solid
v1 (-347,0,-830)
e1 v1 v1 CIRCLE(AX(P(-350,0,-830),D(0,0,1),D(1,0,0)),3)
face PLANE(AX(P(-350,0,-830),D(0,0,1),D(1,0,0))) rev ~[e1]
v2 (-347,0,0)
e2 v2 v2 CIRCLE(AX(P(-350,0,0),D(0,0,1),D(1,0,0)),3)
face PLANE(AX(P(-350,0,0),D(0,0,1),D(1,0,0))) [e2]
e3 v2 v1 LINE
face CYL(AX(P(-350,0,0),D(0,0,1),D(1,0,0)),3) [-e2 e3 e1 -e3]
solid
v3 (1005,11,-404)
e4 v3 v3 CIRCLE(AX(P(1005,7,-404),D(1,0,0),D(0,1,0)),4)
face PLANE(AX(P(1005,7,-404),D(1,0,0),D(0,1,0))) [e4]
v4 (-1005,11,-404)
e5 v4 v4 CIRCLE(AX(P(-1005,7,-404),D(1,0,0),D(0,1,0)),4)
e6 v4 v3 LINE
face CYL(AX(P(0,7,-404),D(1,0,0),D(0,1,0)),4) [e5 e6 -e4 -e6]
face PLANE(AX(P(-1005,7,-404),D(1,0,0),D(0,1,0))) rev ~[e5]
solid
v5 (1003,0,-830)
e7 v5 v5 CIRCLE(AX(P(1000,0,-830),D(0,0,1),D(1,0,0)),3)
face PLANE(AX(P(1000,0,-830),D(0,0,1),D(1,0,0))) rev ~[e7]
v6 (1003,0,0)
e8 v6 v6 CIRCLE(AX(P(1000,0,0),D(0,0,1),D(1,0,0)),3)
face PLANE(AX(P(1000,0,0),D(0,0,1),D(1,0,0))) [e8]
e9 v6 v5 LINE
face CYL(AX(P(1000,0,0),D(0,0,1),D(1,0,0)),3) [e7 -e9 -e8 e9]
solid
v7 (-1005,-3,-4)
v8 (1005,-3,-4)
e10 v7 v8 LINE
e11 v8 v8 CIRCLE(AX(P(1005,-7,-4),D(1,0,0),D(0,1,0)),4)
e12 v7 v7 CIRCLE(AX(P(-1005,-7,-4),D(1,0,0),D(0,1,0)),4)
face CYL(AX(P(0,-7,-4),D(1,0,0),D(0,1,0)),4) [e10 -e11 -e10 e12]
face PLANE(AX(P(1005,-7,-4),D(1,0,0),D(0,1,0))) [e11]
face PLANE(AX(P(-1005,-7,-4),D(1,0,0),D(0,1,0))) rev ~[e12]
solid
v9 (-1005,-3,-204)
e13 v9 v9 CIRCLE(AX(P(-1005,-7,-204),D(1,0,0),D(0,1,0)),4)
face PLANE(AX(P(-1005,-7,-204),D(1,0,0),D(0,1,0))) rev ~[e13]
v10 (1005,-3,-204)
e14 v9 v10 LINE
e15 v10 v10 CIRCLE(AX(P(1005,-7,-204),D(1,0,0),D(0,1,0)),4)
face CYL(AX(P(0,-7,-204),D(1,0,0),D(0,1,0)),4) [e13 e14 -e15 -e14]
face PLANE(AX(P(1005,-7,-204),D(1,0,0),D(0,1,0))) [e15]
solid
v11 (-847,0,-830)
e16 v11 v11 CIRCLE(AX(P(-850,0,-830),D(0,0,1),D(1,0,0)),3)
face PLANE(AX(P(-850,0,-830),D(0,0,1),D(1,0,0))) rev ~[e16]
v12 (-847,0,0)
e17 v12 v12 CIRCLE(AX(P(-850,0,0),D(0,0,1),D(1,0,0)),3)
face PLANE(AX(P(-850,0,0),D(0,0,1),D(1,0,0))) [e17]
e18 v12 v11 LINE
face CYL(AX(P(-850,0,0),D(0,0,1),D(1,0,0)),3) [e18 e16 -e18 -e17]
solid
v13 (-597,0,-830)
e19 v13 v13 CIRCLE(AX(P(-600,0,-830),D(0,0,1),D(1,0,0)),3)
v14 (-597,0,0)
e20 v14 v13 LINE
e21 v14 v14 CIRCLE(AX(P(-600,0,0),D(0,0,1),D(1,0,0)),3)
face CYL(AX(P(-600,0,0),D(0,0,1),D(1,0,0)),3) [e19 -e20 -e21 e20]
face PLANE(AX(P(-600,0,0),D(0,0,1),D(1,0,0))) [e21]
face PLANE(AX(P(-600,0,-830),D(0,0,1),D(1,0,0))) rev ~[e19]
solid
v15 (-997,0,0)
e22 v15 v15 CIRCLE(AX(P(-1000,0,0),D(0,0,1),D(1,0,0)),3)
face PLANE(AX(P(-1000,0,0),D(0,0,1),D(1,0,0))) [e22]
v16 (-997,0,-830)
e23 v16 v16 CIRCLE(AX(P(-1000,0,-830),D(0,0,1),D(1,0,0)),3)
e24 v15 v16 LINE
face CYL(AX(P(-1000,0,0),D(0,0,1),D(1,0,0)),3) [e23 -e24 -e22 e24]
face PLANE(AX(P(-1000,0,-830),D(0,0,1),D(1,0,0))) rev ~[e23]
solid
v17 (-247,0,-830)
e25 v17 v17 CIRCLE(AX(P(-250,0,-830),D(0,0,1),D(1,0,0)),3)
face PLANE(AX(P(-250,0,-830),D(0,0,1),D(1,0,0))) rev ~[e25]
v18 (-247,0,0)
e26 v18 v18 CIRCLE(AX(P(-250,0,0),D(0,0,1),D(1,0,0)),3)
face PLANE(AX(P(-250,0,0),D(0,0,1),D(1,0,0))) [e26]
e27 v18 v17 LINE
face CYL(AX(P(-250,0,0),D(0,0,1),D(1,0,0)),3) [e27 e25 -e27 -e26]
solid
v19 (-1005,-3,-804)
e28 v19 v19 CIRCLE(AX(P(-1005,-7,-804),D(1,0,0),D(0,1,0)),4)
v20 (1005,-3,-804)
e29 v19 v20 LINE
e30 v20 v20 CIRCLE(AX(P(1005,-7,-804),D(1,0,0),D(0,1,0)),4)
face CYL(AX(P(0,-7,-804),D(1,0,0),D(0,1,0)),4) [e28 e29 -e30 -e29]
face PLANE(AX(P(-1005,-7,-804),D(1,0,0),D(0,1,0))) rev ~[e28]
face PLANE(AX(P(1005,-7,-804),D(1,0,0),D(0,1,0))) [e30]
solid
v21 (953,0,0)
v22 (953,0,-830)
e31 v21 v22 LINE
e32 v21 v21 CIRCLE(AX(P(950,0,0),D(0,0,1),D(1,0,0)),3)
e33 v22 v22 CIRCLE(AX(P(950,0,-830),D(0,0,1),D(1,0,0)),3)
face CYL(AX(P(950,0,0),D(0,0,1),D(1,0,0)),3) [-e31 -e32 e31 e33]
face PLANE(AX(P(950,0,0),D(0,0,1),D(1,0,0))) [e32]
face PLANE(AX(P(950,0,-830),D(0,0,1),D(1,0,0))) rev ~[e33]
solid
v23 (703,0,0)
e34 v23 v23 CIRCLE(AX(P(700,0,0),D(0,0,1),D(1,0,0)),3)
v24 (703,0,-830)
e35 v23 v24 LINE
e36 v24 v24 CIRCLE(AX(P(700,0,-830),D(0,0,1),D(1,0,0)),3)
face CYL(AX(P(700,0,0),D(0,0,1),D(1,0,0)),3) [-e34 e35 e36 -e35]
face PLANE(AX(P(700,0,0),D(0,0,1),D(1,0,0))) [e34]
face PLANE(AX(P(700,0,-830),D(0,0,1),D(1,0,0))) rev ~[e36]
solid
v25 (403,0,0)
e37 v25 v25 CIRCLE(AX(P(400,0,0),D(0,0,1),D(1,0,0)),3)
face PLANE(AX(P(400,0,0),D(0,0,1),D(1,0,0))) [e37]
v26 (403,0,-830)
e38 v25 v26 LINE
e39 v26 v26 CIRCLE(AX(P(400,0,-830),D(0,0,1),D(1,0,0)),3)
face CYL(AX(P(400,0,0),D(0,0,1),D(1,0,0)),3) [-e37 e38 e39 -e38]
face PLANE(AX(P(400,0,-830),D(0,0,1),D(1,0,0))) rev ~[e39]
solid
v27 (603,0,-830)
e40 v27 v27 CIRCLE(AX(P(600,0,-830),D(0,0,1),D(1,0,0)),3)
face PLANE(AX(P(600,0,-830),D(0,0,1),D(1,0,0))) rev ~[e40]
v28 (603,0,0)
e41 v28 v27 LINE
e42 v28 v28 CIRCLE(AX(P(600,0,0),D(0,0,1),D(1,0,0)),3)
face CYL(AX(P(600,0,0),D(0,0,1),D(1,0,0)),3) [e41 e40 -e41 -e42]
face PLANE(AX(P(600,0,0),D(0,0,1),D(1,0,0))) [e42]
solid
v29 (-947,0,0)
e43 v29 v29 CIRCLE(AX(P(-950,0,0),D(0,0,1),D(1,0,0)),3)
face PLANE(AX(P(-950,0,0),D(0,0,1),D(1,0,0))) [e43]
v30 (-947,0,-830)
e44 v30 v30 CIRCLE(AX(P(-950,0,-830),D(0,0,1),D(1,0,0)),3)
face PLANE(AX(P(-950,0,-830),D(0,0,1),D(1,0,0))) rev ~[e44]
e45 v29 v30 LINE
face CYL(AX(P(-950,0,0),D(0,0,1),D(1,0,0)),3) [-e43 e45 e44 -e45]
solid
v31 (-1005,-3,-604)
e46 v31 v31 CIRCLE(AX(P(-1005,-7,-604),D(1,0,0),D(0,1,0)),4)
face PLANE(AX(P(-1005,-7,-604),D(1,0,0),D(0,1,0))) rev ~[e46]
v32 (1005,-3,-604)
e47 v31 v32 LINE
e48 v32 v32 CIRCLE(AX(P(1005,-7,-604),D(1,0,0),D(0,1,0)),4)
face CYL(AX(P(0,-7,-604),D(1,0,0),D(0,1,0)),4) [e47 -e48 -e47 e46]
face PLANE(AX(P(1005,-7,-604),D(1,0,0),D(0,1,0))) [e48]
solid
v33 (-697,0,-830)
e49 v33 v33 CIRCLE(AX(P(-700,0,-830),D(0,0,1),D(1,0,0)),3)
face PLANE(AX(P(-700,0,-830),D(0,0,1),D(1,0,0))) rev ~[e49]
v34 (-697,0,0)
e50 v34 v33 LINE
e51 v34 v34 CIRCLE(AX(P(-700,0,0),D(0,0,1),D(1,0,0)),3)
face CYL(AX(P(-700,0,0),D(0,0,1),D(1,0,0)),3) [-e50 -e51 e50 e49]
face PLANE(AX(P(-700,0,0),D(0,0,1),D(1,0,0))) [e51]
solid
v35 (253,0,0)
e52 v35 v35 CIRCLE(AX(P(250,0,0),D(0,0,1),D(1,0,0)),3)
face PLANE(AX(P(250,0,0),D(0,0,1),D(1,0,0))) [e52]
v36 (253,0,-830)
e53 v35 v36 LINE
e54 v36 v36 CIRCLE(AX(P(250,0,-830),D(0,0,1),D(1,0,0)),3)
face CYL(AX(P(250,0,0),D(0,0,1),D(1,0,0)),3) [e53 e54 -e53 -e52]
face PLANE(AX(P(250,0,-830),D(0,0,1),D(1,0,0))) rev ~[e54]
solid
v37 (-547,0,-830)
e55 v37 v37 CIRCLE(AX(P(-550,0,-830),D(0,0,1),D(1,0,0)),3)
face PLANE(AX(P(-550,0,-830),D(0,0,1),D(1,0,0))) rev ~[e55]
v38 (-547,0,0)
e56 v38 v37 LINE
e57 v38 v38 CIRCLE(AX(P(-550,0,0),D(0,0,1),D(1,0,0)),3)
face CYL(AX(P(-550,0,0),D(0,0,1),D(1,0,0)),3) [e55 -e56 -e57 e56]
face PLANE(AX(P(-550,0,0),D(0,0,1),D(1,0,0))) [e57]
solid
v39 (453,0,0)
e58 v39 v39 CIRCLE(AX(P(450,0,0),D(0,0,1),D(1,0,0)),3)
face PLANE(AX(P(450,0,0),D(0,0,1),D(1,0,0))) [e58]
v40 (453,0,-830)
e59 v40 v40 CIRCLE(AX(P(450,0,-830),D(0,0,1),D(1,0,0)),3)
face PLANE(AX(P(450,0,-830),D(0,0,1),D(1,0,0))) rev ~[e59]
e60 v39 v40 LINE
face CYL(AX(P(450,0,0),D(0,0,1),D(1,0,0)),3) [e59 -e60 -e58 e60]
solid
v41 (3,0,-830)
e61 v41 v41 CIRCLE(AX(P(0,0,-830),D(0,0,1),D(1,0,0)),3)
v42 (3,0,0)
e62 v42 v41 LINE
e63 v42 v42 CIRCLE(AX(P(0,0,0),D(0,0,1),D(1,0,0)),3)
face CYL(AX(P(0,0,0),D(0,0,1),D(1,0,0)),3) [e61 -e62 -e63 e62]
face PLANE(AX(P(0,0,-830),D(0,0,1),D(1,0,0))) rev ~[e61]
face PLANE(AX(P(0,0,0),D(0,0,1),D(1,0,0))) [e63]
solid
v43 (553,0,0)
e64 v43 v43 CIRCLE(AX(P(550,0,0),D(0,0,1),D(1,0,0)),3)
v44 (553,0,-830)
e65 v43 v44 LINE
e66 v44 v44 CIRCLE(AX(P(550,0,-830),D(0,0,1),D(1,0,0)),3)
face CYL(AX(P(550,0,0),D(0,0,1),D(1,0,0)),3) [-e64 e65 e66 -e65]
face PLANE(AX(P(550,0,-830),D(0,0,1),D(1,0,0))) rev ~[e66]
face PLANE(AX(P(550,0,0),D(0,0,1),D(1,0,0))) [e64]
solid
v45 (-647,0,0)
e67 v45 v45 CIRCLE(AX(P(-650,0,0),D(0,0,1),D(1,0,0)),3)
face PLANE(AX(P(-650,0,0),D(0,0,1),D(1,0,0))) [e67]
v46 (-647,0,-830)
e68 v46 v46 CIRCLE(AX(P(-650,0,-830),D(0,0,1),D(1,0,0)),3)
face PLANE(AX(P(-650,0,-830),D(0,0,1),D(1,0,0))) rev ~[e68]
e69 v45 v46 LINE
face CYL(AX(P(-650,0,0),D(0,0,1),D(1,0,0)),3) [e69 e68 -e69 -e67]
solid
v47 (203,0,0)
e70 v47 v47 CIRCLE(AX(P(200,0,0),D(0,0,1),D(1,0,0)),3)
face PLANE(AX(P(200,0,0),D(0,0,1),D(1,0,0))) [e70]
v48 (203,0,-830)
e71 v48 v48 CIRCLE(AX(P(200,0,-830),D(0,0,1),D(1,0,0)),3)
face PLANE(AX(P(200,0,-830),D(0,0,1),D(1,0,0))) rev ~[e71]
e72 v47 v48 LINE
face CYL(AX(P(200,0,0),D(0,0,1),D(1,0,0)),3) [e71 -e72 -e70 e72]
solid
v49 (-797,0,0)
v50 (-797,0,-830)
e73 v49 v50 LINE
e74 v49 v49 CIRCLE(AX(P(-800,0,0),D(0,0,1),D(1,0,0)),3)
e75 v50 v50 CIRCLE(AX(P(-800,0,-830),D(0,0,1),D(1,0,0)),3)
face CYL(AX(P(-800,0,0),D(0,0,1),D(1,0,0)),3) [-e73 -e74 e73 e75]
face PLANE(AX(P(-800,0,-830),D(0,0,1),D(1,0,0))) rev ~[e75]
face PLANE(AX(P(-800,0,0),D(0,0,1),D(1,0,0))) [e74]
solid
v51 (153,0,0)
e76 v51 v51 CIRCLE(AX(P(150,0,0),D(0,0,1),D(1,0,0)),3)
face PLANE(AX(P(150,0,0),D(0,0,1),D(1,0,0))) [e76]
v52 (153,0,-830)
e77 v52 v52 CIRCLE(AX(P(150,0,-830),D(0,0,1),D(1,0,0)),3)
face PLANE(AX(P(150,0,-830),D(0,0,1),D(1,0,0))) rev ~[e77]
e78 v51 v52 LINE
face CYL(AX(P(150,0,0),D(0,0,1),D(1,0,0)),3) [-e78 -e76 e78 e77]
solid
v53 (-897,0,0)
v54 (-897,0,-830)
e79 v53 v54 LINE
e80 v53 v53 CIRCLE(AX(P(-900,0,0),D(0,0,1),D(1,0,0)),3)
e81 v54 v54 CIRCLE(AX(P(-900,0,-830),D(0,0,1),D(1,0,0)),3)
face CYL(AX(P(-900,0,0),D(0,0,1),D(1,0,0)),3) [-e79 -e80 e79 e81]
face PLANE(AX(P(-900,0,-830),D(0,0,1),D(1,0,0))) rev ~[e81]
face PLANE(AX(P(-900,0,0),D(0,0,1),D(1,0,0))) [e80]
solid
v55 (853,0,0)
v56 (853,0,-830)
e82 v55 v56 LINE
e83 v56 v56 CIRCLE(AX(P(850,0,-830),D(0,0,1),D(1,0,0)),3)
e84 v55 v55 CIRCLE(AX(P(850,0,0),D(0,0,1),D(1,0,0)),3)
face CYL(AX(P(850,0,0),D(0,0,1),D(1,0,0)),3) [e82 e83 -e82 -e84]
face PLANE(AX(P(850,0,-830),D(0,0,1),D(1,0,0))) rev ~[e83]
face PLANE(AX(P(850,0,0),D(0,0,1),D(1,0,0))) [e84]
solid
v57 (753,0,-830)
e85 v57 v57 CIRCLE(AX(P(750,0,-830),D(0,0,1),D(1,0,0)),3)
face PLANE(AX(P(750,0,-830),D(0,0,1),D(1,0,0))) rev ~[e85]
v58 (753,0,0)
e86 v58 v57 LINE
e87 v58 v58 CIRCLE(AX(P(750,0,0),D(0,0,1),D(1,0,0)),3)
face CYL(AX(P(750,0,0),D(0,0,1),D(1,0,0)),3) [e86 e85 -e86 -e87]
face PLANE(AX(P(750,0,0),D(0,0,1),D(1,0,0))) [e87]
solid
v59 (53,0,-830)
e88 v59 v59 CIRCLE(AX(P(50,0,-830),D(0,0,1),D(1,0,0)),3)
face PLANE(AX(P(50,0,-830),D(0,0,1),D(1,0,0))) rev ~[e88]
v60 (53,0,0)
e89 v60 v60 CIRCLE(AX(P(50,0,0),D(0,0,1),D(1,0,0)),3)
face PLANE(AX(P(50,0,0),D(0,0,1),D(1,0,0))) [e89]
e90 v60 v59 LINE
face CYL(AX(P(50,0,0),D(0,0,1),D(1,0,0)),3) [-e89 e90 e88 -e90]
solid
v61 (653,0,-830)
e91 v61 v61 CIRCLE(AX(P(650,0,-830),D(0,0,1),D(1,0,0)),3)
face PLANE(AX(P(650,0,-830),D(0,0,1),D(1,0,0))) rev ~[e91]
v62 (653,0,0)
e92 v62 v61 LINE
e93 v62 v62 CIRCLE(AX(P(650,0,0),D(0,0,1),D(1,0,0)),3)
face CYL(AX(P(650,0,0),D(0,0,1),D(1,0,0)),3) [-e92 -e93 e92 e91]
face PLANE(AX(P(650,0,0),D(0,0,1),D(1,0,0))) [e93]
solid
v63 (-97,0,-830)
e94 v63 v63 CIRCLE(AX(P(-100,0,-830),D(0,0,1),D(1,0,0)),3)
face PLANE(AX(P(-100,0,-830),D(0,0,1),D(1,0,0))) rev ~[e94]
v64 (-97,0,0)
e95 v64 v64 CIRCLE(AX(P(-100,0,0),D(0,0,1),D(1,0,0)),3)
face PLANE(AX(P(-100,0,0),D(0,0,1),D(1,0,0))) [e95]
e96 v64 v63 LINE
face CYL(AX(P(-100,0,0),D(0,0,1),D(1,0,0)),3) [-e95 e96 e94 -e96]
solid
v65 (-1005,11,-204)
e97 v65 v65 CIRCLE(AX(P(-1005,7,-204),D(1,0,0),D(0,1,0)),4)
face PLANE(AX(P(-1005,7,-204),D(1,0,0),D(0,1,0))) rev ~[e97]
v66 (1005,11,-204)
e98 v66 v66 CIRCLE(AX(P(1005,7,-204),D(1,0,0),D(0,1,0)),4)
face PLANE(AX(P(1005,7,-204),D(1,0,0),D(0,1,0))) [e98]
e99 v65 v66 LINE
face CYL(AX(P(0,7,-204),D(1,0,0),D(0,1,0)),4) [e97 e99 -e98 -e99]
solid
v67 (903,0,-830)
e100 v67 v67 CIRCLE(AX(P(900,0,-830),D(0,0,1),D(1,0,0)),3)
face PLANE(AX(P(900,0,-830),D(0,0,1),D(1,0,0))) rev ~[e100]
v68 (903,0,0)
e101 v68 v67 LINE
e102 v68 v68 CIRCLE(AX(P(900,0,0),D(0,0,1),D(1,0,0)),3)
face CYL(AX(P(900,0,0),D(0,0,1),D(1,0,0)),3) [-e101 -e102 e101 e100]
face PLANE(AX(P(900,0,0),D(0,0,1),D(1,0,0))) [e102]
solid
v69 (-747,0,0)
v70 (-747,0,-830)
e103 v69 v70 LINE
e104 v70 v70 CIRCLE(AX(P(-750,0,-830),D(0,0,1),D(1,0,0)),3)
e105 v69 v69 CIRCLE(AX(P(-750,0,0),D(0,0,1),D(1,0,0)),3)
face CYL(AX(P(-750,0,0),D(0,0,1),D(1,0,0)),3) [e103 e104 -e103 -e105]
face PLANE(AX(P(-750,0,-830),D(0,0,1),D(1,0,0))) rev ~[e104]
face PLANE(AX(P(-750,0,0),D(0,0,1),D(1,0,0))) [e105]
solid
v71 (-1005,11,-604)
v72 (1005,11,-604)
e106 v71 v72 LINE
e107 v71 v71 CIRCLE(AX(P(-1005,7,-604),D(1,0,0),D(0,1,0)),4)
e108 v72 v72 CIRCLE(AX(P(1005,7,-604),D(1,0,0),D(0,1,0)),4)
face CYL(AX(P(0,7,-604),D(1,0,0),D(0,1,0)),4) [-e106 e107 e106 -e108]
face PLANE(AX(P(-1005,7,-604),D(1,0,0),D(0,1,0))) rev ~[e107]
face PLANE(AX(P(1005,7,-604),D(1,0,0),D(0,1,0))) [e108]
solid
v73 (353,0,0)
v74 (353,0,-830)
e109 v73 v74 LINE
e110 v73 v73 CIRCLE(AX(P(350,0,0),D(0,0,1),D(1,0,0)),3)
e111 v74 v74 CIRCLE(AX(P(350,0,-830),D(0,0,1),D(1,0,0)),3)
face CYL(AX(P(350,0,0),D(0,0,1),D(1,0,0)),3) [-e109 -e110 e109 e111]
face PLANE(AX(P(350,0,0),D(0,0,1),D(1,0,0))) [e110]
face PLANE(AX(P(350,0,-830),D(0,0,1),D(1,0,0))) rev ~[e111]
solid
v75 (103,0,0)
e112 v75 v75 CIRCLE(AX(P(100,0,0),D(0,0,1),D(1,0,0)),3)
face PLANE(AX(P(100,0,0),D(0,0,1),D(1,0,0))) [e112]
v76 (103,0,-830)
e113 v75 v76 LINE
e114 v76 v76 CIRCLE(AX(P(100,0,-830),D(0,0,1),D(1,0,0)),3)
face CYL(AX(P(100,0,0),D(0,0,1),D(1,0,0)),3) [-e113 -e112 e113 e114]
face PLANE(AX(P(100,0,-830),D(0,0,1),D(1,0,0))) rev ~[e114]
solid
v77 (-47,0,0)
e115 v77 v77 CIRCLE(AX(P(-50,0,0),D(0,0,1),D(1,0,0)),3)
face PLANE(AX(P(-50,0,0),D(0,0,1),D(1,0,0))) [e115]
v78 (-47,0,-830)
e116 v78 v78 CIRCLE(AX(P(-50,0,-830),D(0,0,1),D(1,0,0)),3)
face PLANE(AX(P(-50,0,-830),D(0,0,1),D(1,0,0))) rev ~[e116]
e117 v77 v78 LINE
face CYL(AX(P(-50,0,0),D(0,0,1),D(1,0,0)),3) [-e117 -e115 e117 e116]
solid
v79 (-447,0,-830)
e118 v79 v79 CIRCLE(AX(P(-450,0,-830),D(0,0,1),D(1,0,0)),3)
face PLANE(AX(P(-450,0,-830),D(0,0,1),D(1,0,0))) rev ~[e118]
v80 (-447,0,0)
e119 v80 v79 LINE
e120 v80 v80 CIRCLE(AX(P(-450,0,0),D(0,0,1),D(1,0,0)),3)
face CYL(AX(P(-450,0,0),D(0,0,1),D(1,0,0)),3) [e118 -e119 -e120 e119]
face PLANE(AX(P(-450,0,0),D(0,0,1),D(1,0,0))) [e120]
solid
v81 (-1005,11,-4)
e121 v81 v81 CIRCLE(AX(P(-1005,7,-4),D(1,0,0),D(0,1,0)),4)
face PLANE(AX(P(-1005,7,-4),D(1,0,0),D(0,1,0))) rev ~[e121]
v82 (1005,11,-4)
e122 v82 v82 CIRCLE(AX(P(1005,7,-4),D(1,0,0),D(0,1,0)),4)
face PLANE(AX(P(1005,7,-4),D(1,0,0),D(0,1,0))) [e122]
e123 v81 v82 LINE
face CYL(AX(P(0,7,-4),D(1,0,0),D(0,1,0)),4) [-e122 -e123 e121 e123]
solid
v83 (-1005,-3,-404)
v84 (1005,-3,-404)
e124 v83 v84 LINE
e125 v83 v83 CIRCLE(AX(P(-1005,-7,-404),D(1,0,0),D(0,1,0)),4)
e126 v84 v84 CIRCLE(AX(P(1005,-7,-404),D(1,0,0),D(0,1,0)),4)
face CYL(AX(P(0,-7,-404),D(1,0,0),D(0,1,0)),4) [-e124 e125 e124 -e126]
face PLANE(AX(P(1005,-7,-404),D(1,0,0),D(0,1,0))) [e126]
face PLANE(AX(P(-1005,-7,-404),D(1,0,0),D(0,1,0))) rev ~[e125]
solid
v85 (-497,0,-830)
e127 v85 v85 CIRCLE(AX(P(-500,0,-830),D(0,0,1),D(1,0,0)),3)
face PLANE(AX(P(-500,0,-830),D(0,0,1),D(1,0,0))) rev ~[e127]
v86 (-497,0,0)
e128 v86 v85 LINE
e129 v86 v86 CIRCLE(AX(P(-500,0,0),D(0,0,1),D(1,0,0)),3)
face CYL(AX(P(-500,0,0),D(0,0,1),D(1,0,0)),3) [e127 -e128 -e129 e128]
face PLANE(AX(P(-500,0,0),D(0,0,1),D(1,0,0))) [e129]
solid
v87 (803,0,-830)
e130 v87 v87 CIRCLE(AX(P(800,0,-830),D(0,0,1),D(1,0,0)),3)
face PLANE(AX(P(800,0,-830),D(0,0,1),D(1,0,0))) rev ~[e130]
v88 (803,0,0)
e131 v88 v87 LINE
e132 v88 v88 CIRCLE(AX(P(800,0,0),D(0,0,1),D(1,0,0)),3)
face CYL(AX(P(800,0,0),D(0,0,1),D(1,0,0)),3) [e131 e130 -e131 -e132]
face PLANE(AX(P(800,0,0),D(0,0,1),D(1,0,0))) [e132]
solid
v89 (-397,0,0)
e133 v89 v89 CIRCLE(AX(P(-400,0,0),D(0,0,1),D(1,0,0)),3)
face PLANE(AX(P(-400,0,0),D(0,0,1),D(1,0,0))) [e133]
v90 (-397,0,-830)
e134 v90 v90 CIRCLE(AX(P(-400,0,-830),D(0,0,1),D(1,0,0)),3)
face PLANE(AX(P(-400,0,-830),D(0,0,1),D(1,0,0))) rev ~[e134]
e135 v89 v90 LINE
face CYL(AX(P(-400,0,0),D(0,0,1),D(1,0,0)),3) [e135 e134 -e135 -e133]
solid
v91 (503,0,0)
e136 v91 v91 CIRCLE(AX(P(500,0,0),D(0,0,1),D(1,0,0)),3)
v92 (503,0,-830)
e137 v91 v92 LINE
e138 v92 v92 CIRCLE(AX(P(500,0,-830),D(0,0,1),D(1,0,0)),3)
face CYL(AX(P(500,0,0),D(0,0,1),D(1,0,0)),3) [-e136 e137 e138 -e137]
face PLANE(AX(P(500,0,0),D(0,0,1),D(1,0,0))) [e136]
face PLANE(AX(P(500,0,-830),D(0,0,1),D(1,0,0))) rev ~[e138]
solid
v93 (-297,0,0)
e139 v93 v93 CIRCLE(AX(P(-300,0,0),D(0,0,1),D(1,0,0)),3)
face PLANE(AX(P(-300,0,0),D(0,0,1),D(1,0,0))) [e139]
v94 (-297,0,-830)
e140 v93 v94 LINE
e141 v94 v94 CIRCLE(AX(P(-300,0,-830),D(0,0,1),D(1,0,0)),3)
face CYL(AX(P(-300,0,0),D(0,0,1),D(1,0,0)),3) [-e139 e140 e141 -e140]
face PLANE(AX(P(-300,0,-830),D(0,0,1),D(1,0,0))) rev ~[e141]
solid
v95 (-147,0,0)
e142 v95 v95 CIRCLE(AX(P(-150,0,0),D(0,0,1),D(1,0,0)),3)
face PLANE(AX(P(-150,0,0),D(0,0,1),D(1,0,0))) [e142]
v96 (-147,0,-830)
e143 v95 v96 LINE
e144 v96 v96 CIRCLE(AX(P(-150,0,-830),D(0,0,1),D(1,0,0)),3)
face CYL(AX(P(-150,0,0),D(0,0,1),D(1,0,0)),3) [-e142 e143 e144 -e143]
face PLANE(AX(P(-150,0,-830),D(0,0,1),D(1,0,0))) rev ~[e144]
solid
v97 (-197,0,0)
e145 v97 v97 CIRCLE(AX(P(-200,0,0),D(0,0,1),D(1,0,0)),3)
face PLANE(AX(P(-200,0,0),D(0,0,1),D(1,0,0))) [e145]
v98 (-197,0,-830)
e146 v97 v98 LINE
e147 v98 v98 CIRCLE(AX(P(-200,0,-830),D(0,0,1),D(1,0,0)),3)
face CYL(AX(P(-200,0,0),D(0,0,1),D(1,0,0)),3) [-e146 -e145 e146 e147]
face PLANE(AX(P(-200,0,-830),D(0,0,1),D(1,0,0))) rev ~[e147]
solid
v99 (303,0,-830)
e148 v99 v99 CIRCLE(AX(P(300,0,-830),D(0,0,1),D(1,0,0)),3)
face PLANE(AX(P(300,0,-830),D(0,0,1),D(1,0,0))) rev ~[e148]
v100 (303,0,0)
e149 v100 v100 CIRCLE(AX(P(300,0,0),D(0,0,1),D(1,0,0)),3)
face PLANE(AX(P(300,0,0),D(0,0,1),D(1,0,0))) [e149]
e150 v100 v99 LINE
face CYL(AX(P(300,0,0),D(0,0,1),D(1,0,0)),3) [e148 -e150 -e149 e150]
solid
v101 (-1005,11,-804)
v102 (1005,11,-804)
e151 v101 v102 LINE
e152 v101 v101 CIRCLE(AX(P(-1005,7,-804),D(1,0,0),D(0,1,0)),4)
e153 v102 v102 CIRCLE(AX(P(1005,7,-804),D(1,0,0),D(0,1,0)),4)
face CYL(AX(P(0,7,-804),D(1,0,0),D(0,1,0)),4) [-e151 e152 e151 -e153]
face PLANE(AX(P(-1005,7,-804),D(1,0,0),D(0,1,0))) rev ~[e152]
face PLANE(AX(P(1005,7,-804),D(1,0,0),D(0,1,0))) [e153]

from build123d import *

# Parameters (mm, degrees)
F0_R     = 3
F1_DEPTH = 830
F2_R     = 4
F3_DEPTH = 1005


with BuildPart() as f1:
    # F0 (on Top) → F1 (new body)
    with BuildSketch(Plane.XY):
        with Locations((750, 0)):
            Circle(F0_R)
    extrude(amount=-F1_DEPTH)


with BuildPart() as f1b:
    # F0 (on Top) → F1, piece 2 (new body)
    with BuildSketch(Plane.XY):
        with Locations((-550, 0)):
            Circle(F0_R)
    extrude(amount=-F1_DEPTH)


with BuildPart() as f1c:
    # F0 (on Top) → F1, piece 3 (new body)
    with BuildSketch(Plane.XY):
        with Locations((950, 0)):
            Circle(F0_R)
    extrude(amount=-F1_DEPTH)


with BuildPart() as f1d:
    # F0 (on Top) → F1, piece 4 (new body)
    with BuildSketch(Plane.XY):
        with Locations((450, 0)):
            Circle(F0_R)
    extrude(amount=-F1_DEPTH)


with BuildPart() as f1e:
    # F0 (on Top) → F1, piece 5 (new body)
    with BuildSketch(Plane.XY):
        with Locations((-800, 0)):
            Circle(F0_R)
    extrude(amount=-F1_DEPTH)


with BuildPart() as f1f:
    # F0 (on Top) → F1, piece 6 (new body)
    with BuildSketch(Plane.XY):
        with Locations((-900, 0)):
            Circle(F0_R)
    extrude(amount=-F1_DEPTH)


with BuildPart() as f1g:
    # F0 (on Top) → F1, piece 7 (new body)
    with BuildSketch(Plane.XY):
        with Locations((350, 0)):
            Circle(F0_R)
    extrude(amount=-F1_DEPTH)


with BuildPart() as f1h:
    # F0 (on Top) → F1, piece 8 (new body)
    with BuildSketch(Plane.XY):
        with Locations((-700, 0)):
            Circle(F0_R)
    extrude(amount=-F1_DEPTH)


with BuildPart() as f1i:
    # F0 (on Top) → F1, piece 9 (new body)
    with BuildSketch(Plane.XY):
        with Locations((1000, 0)):
            Circle(F0_R)
    extrude(amount=-F1_DEPTH)


with BuildPart() as f1j:
    # F0 (on Top) → F1, piece 10 (new body)
    with BuildSketch(Plane.XY):
        with Locations((600, 0)):
            Circle(F0_R)
    extrude(amount=-F1_DEPTH)


with BuildPart() as f1k:
    # F0 (on Top) → F1, piece 11 (new body)
    with BuildSketch(Plane.XY):
        with Locations((700, 0)):
            Circle(F0_R)
    extrude(amount=-F1_DEPTH)


with BuildPart() as f1l:
    # F0 (on Top) → F1, piece 12 (new body)
    with BuildSketch(Plane.XY):
        with Locations((650, 0)):
            Circle(F0_R)
    extrude(amount=-F1_DEPTH)


with BuildPart() as f1m:
    # F0 (on Top) → F1, piece 13 (new body)
    with BuildSketch(Plane.XY):
        with Locations((-650, 0)):
            Circle(F0_R)
    extrude(amount=-F1_DEPTH)


with BuildPart() as f1n:
    # F0 (on Top) → F1, piece 14 (new body)
    with BuildSketch(Plane.XY):
        with Locations((850, 0)):
            Circle(F0_R)
    extrude(amount=-F1_DEPTH)


with BuildPart() as f1o:
    # F0 (on Top) → F1, piece 15 (new body)
    with BuildSketch(Plane.XY):
        with Locations((-300, 0)):
            Circle(F0_R)
    extrude(amount=-F1_DEPTH)


with BuildPart() as f1p:
    # F0 (on Top) → F1, piece 16 (new body)
    with BuildSketch(Plane.XY):
        with Locations((-250, 0)):
            Circle(F0_R)
    extrude(amount=-F1_DEPTH)


with BuildPart() as f1q:
    # F0 (on Top) → F1, piece 17 (new body)
    with BuildSketch(Plane.XY):
        with Locations((-350, 0)):
            Circle(F0_R)
    extrude(amount=-F1_DEPTH)


with BuildPart() as f1r:
    # F0 (on Top) → F1, piece 18 (new body)
    with BuildSketch(Plane.XY):
        with Locations((-400, 0)):
            Circle(F0_R)
    extrude(amount=-F1_DEPTH)


with BuildPart() as f1s:
    # F0 (on Top) → F1, piece 19 (new body)
    with BuildSketch(Plane.XY):
        with Locations((-500, 0)):
            Circle(F0_R)
    extrude(amount=-F1_DEPTH)


with BuildPart() as f1t:
    # F0 (on Top) → F1, piece 20 (new body)
    with BuildSketch(Plane.XY):
        with Locations((-950, 0)):
            Circle(F0_R)
    extrude(amount=-F1_DEPTH)


with BuildPart() as f1u:
    # F0 (on Top) → F1, piece 21 (new body)
    with BuildSketch(Plane.XY):
        with Locations((-450, 0)):
            Circle(F0_R)
    extrude(amount=-F1_DEPTH)


with BuildPart() as f1v:
    # F0 (on Top) → F1, piece 22 (new body)
    with BuildSketch(Plane.XY):
        with Locations((150, 0)):
            Circle(F0_R)
    extrude(amount=-F1_DEPTH)


with BuildPart() as f1w:
    # F0 (on Top) → F1, piece 23 (new body)
    with BuildSketch(Plane.XY):
        with Locations((50, 0)):
            Circle(F0_R)
    extrude(amount=-F1_DEPTH)


with BuildPart() as f1x:
    # F0 (on Top) → F1, piece 24 (new body)
    with BuildSketch(Plane.XY):
        with Locations((100, 0)):
            Circle(F0_R)
    extrude(amount=-F1_DEPTH)


with BuildPart() as f1y:
    # F0 (on Top) → F1, piece 25 (new body)
    with BuildSketch(Plane.XY):
        Circle(F0_R)
    extrude(amount=-F1_DEPTH)


with BuildPart() as f1z:
    # F0 (on Top) → F1, piece 26 (new body)
    with BuildSketch(Plane.XY):
        with Locations((-50, 0)):
            Circle(F0_R)
    extrude(amount=-F1_DEPTH)


with BuildPart() as f1ba:
    # F0 (on Top) → F1, piece 27 (new body)
    with BuildSketch(Plane.XY):
        with Locations((-150, 0)):
            Circle(F0_R)
    extrude(amount=-F1_DEPTH)


with BuildPart() as f1bb:
    # F0 (on Top) → F1, piece 28 (new body)
    with BuildSketch(Plane.XY):
        with Locations((-100, 0)):
            Circle(F0_R)
    extrude(amount=-F1_DEPTH)


with BuildPart() as f1bc:
    # F0 (on Top) → F1, piece 29 (new body)
    with BuildSketch(Plane.XY):
        with Locations((-1000, 0)):
            Circle(F0_R)
    extrude(amount=-F1_DEPTH)


with BuildPart() as f1bd:
    # F0 (on Top) → F1, piece 30 (new body)
    with BuildSketch(Plane.XY):
        with Locations((300, 0)):
            Circle(F0_R)
    extrude(amount=-F1_DEPTH)


with BuildPart() as f1be:
    # F0 (on Top) → F1, piece 31 (new body)
    with BuildSketch(Plane.XY):
        with Locations((250, 0)):
            Circle(F0_R)
    extrude(amount=-F1_DEPTH)


with BuildPart() as f1bf:
    # F0 (on Top) → F1, piece 32 (new body)
    with BuildSketch(Plane.XY):
        with Locations((-200, 0)):
            Circle(F0_R)
    extrude(amount=-F1_DEPTH)


with BuildPart() as f1bg:
    # F0 (on Top) → F1, piece 33 (new body)
    with BuildSketch(Plane.XY):
        with Locations((900, 0)):
            Circle(F0_R)
    extrude(amount=-F1_DEPTH)


with BuildPart() as f1bh:
    # F0 (on Top) → F1, piece 34 (new body)
    with BuildSketch(Plane.XY):
        with Locations((-750, 0)):
            Circle(F0_R)
    extrude(amount=-F1_DEPTH)


with BuildPart() as f1bi:
    # F0 (on Top) → F1, piece 35 (new body)
    with BuildSketch(Plane.XY):
        with Locations((200, 0)):
            Circle(F0_R)
    extrude(amount=-F1_DEPTH)


with BuildPart() as f1bj:
    # F0 (on Top) → F1, piece 36 (new body)
    with BuildSketch(Plane.XY):
        with Locations((500, 0)):
            Circle(F0_R)
    extrude(amount=-F1_DEPTH)


with BuildPart() as f1bk:
    # F0 (on Top) → F1, piece 37 (new body)
    with BuildSketch(Plane.XY):
        with Locations((550, 0)):
            Circle(F0_R)
    extrude(amount=-F1_DEPTH)


with BuildPart() as f1bl:
    # F0 (on Top) → F1, piece 38 (new body)
    with BuildSketch(Plane.XY):
        with Locations((-600, 0)):
            Circle(F0_R)
    extrude(amount=-F1_DEPTH)


with BuildPart() as f1bm:
    # F0 (on Top) → F1, piece 39 (new body)
    with BuildSketch(Plane.XY):
        with Locations((800, 0)):
            Circle(F0_R)
    extrude(amount=-F1_DEPTH)


with BuildPart() as f1bn:
    # F0 (on Top) → F1, piece 40 (new body)
    with BuildSketch(Plane.XY):
        with Locations((-850, 0)):
            Circle(F0_R)
    extrude(amount=-F1_DEPTH)


with BuildPart() as f1bo:
    # F0 (on Top) → F1, piece 41 (new body)
    with BuildSketch(Plane.XY):
        with Locations((400, 0)):
            Circle(F0_R)
    extrude(amount=-F1_DEPTH)


with BuildPart() as f3:
    # F2 (on Right) → F3 (new body, symmetric)
    with BuildSketch(Plane.YZ):
        with Locations((7, -4)):
            Circle(F2_R)
    extrude(amount=F3_DEPTH, both=True)


with BuildPart() as f3b:
    # F2 (on Right) → F3, piece 2 (new body, symmetric)
    with BuildSketch(Plane.YZ):
        with Locations((-7, -4)):
            Circle(F2_R)
    extrude(amount=F3_DEPTH, both=True)


with BuildPart() as f3c:
    # F2 (on Right) → F3, piece 3 (new body, symmetric)
    with BuildSketch(Plane.YZ):
        with Locations((7, -204)):
            Circle(F2_R)
    extrude(amount=F3_DEPTH, both=True)


with BuildPart() as f3d:
    # F2 (on Right) → F3, piece 4 (new body, symmetric)
    with BuildSketch(Plane.YZ):
        with Locations((-7, -204)):
            Circle(F2_R)
    extrude(amount=F3_DEPTH, both=True)


with BuildPart() as f3e:
    # F2 (on Right) → F3, piece 5 (new body, symmetric)
    with BuildSketch(Plane.YZ):
        with Locations((7, -404)):
            Circle(F2_R)
    extrude(amount=F3_DEPTH, both=True)


with BuildPart() as f3f:
    # F2 (on Right) → F3, piece 6 (new body, symmetric)
    with BuildSketch(Plane.YZ):
        with Locations((-7, -404)):
            Circle(F2_R)
    extrude(amount=F3_DEPTH, both=True)


with BuildPart() as f3g:
    # F2 (on Right) → F3, piece 7 (new body, symmetric)
    with BuildSketch(Plane.YZ):
        with Locations((7, -604)):
            Circle(F2_R)
    extrude(amount=F3_DEPTH, both=True)


with BuildPart() as f3h:
    # F2 (on Right) → F3, piece 8 (new body, symmetric)
    with BuildSketch(Plane.YZ):
        with Locations((-7, -604)):
            Circle(F2_R)
    extrude(amount=F3_DEPTH, both=True)


with BuildPart() as f3i:
    # F2 (on Right) → F3, piece 9 (new body, symmetric)
    with BuildSketch(Plane.YZ):
        with Locations((7, -804)):
            Circle(F2_R)
    extrude(amount=F3_DEPTH, both=True)


with BuildPart() as f3j:
    # F2 (on Right) → F3, piece 10 (new body, symmetric)
    with BuildSketch(Plane.YZ):
        with Locations((-7, -804)):
            Circle(F2_R)
    extrude(amount=F3_DEPTH, both=True)


solid = Compound([f1.part, f1b.part, f1c.part, f1d.part, f1e.part, f1f.part, f1g.part, f1h.part, f1i.part, f1j.part, f1k.part, f1l.part, f1m.part, f1n.part, f1o.part, f1p.part, f1q.part, f1r.part, f1s.part, f1t.part, f1u.part, f1v.part, f1w.part, f1x.part, f1y.part, f1z.part, f1ba.part, f1bb.part, f1bc.part, f1bd.part, f1be.part, f1bf.part, f1bg.part, f1bh.part, f1bi.part, f1bj.part, f1bk.part, f1bl.part, f1bm.part, f1bn.part, f1bo.part, f3.part, f3b.part, f3c.part, f3d.part, f3e.part, f3f.part, f3g.part, f3h.part, f3i.part, f3j.part])
